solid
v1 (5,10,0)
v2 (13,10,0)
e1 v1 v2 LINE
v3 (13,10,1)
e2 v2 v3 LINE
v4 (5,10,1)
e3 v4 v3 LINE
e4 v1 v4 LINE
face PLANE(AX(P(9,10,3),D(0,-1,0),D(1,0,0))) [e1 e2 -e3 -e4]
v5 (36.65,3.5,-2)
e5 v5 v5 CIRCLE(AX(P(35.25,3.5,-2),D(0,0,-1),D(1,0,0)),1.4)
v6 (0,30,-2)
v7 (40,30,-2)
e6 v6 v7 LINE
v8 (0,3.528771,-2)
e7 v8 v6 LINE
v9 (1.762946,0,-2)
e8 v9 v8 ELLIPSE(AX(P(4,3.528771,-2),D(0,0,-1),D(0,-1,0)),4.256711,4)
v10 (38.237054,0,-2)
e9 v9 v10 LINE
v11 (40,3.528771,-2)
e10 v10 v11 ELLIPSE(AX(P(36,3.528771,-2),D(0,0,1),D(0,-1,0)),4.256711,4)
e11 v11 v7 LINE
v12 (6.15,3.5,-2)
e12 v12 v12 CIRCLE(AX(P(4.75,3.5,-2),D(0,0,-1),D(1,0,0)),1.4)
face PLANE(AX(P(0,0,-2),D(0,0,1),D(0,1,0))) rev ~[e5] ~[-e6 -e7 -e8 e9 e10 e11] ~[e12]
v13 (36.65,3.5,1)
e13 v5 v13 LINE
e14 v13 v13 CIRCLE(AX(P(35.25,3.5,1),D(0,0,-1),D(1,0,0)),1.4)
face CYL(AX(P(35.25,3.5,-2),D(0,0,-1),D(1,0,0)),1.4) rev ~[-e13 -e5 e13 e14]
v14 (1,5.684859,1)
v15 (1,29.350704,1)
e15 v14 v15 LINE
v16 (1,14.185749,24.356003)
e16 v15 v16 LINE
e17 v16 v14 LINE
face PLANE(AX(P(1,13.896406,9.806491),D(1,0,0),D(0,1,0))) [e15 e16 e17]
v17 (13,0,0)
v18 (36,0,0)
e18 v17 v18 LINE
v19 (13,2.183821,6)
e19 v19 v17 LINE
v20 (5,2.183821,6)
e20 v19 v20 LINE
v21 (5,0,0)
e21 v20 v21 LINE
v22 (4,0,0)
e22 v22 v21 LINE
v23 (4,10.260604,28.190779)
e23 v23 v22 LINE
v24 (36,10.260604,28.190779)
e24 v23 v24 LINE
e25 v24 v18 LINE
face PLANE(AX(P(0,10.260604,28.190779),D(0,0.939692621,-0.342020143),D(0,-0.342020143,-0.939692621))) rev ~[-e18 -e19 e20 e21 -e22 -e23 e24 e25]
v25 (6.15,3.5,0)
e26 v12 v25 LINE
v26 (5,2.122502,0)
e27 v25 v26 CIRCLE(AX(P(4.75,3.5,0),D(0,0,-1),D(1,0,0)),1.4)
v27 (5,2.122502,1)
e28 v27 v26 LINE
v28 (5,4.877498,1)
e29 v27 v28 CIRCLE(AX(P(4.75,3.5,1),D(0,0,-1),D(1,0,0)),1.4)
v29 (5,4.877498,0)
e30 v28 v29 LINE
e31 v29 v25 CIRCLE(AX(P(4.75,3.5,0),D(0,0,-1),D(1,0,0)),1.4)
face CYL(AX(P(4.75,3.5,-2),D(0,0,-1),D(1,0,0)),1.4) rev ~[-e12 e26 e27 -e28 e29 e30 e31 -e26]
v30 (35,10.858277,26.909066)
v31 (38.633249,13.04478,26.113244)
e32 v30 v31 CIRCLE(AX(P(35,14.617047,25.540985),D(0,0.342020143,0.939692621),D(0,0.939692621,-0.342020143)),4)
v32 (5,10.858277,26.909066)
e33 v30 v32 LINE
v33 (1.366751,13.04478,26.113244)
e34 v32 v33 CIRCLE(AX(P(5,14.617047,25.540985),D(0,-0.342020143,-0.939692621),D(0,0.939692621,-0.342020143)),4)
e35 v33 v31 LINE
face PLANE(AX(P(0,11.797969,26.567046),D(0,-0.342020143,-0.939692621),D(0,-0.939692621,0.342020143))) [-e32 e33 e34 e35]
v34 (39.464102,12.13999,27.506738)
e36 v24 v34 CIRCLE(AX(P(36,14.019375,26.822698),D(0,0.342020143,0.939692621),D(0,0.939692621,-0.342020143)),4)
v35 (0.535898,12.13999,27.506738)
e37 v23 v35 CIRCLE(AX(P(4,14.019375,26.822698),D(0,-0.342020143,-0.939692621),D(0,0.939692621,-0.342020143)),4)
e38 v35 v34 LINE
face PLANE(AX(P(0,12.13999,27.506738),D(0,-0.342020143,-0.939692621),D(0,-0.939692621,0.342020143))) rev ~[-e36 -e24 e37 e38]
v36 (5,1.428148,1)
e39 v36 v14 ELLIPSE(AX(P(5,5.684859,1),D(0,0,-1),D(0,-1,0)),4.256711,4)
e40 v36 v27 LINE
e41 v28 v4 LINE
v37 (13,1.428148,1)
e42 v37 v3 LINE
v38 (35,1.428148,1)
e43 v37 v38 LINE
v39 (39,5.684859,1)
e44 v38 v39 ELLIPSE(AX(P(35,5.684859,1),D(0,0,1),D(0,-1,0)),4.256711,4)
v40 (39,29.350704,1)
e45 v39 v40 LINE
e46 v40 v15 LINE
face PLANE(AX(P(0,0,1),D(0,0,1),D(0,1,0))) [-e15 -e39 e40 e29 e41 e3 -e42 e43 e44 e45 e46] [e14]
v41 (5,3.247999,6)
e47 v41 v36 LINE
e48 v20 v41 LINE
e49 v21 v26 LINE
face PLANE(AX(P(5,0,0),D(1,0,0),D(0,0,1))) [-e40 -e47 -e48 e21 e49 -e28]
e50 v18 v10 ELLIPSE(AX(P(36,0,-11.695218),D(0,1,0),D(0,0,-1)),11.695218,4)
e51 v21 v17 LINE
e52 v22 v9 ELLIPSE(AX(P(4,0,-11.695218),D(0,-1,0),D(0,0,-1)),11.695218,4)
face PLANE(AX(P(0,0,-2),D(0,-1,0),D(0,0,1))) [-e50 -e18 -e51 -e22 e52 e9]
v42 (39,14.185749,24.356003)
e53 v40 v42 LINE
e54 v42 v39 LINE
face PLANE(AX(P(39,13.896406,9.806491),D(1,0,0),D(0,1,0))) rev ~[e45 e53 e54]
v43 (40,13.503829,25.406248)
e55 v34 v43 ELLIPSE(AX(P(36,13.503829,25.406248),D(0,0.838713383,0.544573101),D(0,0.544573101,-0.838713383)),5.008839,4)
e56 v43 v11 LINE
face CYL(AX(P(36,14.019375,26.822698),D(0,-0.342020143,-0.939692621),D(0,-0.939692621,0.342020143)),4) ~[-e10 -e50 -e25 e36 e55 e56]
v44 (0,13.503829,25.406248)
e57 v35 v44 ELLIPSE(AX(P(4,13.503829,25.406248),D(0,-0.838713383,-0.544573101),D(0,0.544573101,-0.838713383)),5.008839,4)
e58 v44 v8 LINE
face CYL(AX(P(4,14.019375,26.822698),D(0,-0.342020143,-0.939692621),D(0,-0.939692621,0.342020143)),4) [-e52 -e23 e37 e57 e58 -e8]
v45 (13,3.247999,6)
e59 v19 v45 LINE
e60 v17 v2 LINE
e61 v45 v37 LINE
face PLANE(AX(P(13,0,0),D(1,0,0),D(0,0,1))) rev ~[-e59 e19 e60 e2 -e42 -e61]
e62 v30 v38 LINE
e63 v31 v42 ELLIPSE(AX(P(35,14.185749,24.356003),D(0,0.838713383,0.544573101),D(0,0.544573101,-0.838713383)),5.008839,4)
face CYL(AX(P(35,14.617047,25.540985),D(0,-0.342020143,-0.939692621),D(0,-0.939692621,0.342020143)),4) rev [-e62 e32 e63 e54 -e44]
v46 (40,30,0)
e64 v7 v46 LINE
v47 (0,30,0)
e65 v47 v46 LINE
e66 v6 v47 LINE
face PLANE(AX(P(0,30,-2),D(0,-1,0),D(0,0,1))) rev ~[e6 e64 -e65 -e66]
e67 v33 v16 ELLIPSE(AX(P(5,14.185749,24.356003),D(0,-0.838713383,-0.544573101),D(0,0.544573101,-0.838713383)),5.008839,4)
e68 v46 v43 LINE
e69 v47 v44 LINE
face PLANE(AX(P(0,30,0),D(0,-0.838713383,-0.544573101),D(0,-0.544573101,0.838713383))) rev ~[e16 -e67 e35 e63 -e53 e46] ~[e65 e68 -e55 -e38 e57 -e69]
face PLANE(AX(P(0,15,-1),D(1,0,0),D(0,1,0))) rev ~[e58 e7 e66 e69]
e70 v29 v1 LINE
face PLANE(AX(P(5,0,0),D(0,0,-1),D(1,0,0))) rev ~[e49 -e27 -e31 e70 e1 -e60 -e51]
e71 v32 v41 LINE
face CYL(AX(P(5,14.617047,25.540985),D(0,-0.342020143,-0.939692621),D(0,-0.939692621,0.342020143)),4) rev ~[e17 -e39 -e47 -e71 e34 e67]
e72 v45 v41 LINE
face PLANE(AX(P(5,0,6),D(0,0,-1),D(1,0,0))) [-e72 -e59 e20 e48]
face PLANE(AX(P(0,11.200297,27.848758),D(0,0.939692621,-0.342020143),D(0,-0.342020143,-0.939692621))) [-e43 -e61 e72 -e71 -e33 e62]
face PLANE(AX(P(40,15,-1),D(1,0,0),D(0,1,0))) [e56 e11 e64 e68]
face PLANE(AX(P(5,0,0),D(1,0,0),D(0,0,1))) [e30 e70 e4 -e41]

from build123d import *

# Parameters (mm, degrees)
F1_DEPTH = 40
F2_T     = -1
F0_W     = 30
F0_H     = 2
F3_DEPTH = 40
F4_W     = 8
F4_H     = 6
F5_DEPTH = 10
F6_R     = 1.4
F7_DEPTH = 3
F8_R     = 4


with BuildPart() as f1:
    # F0 (on Right) → F1 (new body)
    with BuildSketch(Plane.YZ):
        Polygon((10.2606042998, 28.1907786236), (0, 0), (30, 0), (12.1399895413, 27.5067383369), align=None)
    extrude(amount=F1_DEPTH)

    # F2
    f2_openings = [f1.faces().sort_by_distance(p)[0] for p in [
        (20, 21.069995, 13.753369),
    ]]
    offset(amount=F2_T, openings=f2_openings, kind=Kind.INTERSECTION)

    # F0 (on Right) → F3 (join)
    with BuildSketch(Plane.YZ):
        with Locations((15, -1)):
            Rectangle(F0_W, F0_H)
    extrude(amount=F3_DEPTH)

    # F4 (on Front) → F5 (cut)
    with BuildSketch(Plane.XZ):
        with Locations((9, 3)):
            Rectangle(F4_W, F4_H)
    extrude(amount=-F5_DEPTH, mode=Mode.SUBTRACT)

    # F6 (on face) → F7 (cut)
    with BuildSketch(Plane(origin=(0, 0, -2), x_dir=(1, 0, 0), z_dir=(0, 0, -1))):
        with Locations((4.75, -3.5)):
            Circle(F6_R)
        with Locations((35.25, -3.5)):
            Circle(F6_R)
    extrude(amount=-F7_DEPTH, mode=Mode.SUBTRACT)

    # F8
    f8_edges = [f1.edges().sort_by_distance(p)[0] for p in [
        (1, 6.143212, 13.954533),
        (39, 6.143212, 13.954533),
        (0, 5.130302, 14.095389),
        (40, 5.130302, 14.095389),
    ]]
    fillet(f8_edges, radius=F8_R)


solid = f1.part
